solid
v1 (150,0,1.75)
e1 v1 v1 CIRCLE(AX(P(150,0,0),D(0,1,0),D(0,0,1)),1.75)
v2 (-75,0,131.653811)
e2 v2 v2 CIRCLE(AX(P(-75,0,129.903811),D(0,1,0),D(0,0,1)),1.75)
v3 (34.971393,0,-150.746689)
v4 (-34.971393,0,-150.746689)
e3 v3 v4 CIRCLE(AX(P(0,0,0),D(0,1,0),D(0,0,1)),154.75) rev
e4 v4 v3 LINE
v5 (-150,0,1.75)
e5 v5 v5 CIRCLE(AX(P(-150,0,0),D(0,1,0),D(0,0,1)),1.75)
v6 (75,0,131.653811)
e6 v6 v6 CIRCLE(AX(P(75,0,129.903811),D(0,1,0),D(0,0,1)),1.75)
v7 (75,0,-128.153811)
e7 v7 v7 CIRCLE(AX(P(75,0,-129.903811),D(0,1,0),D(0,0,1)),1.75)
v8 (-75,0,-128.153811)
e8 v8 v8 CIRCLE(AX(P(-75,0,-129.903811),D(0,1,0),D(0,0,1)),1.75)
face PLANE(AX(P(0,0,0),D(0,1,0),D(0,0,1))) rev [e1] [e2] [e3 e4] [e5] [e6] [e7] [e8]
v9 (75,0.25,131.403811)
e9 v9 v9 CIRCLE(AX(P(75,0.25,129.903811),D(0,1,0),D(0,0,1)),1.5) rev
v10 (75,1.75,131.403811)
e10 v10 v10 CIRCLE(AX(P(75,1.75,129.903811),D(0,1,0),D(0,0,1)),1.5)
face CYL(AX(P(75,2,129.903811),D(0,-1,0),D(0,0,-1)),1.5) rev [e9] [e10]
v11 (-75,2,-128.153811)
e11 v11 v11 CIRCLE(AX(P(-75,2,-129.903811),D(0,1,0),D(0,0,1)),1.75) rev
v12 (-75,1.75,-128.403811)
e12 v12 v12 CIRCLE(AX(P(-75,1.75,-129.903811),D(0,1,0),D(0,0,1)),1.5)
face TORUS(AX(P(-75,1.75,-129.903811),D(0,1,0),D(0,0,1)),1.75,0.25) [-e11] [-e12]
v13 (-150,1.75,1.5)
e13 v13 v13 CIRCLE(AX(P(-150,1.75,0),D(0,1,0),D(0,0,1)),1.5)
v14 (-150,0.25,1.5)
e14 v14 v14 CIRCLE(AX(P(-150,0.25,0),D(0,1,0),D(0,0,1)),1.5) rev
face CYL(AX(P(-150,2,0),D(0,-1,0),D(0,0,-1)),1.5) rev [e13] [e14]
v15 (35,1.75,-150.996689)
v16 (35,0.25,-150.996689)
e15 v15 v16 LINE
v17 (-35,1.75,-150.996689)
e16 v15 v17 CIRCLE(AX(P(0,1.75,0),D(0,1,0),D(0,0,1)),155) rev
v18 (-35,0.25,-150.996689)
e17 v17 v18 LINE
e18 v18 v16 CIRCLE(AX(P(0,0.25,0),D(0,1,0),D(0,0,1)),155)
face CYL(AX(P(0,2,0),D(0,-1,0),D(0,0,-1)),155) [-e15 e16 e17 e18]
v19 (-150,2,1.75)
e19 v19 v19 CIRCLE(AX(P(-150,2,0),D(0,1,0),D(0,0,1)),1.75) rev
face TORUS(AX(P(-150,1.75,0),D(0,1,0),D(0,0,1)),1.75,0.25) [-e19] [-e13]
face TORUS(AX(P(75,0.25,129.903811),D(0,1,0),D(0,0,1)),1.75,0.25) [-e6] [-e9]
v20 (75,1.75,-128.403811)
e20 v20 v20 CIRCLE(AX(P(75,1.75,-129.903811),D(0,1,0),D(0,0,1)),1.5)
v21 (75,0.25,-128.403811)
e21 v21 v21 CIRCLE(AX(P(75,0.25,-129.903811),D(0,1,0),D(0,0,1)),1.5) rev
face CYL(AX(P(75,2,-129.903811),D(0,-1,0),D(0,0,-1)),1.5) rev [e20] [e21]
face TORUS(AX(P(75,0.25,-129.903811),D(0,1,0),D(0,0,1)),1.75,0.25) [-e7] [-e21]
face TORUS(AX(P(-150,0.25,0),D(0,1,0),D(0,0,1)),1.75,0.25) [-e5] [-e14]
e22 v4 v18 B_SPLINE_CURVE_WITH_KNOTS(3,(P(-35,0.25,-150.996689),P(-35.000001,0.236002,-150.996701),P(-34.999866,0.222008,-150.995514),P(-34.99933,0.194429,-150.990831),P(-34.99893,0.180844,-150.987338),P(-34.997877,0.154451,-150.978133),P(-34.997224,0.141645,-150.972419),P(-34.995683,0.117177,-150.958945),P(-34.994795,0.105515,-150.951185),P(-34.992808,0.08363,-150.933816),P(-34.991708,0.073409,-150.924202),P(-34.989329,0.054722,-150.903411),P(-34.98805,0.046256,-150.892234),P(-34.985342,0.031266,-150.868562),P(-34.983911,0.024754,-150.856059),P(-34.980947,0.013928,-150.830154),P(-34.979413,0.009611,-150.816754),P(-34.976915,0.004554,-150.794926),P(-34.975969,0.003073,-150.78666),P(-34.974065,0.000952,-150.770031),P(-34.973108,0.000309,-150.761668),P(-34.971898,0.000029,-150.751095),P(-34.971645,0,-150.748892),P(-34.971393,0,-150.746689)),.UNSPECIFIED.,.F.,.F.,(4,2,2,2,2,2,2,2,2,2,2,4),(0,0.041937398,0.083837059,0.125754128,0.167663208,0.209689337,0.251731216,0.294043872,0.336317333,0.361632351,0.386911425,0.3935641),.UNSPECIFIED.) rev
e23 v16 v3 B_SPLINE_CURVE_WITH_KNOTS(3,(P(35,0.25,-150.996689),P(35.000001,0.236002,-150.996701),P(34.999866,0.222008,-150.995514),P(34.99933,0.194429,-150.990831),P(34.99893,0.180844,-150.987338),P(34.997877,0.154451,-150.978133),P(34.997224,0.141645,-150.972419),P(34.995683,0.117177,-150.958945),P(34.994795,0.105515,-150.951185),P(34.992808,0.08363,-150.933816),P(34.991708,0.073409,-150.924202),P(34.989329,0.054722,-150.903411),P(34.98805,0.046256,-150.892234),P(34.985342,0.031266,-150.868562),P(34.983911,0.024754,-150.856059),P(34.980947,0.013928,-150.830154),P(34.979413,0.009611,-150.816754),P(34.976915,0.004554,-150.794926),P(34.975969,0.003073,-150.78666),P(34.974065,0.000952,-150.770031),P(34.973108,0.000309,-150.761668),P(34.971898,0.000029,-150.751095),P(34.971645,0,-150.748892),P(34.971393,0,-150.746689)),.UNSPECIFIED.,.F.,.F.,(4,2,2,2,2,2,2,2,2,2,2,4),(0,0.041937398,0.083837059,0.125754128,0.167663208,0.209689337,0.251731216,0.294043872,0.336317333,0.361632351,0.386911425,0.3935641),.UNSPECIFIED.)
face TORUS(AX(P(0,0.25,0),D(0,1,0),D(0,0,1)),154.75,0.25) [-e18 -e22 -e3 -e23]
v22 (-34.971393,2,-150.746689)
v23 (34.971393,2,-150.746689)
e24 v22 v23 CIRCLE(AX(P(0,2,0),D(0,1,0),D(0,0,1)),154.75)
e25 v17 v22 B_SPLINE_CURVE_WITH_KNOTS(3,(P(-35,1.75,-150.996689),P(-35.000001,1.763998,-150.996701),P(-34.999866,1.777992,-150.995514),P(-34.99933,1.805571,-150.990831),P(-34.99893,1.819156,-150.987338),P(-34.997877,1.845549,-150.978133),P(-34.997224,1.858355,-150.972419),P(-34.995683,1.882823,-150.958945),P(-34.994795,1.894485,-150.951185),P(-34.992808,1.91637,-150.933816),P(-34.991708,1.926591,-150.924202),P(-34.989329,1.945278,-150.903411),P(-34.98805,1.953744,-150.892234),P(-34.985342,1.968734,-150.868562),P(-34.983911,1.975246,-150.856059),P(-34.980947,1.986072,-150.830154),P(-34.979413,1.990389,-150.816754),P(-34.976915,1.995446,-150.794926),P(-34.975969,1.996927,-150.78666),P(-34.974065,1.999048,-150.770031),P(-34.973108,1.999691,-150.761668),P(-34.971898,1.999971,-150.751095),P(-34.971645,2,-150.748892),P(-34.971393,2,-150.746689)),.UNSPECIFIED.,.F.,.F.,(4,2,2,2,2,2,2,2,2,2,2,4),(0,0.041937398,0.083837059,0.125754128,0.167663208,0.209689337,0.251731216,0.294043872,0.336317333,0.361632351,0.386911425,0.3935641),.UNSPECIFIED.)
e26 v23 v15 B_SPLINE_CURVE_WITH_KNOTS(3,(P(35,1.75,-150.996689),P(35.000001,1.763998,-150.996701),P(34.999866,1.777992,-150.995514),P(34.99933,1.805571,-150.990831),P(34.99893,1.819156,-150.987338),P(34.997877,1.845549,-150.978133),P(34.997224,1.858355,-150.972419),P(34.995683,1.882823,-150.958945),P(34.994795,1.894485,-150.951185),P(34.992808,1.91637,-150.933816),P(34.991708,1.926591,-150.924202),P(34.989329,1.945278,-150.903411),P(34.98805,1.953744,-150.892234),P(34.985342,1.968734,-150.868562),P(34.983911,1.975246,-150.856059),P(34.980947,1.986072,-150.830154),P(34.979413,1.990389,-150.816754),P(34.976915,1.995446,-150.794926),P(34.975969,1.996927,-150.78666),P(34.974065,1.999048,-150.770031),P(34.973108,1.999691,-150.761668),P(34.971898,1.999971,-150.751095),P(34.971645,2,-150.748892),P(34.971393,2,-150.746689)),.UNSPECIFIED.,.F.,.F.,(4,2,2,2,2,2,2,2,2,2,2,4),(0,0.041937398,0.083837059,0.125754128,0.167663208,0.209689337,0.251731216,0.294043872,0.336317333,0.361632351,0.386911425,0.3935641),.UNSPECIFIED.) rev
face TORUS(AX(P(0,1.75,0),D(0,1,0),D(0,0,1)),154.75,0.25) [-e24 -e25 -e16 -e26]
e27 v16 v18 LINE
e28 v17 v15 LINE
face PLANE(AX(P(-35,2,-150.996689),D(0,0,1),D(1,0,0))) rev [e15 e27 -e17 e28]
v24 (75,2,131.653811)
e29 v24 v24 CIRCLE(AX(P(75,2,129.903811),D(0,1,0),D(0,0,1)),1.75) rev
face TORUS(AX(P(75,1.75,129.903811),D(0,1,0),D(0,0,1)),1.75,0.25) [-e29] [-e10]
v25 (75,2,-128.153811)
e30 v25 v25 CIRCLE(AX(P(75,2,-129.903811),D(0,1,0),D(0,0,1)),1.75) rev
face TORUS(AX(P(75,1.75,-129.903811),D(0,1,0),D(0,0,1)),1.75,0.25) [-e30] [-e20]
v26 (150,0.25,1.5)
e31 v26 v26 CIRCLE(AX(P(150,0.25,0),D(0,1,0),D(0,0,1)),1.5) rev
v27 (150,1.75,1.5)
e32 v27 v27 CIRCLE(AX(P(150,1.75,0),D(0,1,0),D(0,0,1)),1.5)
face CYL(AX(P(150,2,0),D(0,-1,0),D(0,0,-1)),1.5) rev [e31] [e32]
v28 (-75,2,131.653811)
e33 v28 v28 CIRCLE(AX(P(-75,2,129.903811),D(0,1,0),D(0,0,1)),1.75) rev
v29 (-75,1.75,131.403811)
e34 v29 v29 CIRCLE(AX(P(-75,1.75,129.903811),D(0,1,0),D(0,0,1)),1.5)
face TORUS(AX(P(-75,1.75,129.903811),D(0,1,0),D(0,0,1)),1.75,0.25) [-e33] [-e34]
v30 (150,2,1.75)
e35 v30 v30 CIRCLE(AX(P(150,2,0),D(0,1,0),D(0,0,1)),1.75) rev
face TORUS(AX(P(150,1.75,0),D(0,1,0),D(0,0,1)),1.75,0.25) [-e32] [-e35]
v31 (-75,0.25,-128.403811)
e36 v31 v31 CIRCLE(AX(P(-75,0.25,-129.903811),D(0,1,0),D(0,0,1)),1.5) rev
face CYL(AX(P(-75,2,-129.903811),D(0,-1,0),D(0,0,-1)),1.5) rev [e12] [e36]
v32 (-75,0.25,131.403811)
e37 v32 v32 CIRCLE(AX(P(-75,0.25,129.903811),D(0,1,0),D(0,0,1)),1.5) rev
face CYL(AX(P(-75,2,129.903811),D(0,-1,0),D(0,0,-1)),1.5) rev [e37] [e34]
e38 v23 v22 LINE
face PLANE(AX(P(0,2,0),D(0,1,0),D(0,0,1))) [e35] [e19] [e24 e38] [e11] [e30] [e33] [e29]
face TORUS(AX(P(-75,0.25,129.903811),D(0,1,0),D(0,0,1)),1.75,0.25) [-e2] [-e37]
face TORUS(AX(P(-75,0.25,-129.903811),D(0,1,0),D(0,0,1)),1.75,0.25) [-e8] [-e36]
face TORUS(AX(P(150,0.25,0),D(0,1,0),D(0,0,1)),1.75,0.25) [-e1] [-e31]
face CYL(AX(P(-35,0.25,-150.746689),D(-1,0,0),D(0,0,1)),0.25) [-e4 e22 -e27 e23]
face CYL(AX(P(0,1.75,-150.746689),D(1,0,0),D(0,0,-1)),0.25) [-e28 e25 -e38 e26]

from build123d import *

# Parameters (mm, degrees)
BOSS_EXTRUDE1_OUTLINE_R = 1.5
BOSS_EXTRUDE1_DEPTH     = 2
FILLET1_R               = 0.25


# Read off the part's stored shape, not the designer's step: Boss-Extrude1
with BuildPart() as part:
    # Boss-Extrude1 outline → Boss-Extrude1 (new body)
    with BuildSketch(Plane(origin=(0, 0, 0), x_dir=(1, 0, 0), z_dir=(0, 1, 0))):
        with BuildLine():
            ThreePointArc((-35, 150.996688705), (0, -155), (35, 150.996688705))
            Line((35, 150.996688705), (-35, 150.996688705))
        make_face()
        with Locations((-75, -129.903810568)):
            Circle(BOSS_EXTRUDE1_OUTLINE_R, mode=Mode.SUBTRACT)
        with Locations((75, -129.903810568)):
            Circle(BOSS_EXTRUDE1_OUTLINE_R, mode=Mode.SUBTRACT)
        with Locations((-150, 0)):
            Circle(BOSS_EXTRUDE1_OUTLINE_R, mode=Mode.SUBTRACT)
        with Locations((-75, 129.903810568)):
            Circle(BOSS_EXTRUDE1_OUTLINE_R, mode=Mode.SUBTRACT)
        with Locations((150, 0)):
            Circle(BOSS_EXTRUDE1_OUTLINE_R, mode=Mode.SUBTRACT)
        with Locations((75, 129.903810568)):
            Circle(BOSS_EXTRUDE1_OUTLINE_R, mode=Mode.SUBTRACT)
    extrude(amount=BOSS_EXTRUDE1_DEPTH)

    # Fillet1
    fillet1_edges = [part.edges().sort_by_distance(p)[0] for p in [
        (148.5, 0, 0),
        (148.5, 2, 0),
        (73.5, 0, 129.903810568),
        (73.5, 2, 129.903810568),
        (-76.5, 0, 129.903810568),
        (-76.5, 2, 129.903810568),
        (-151.5, 0, 0),
        (-151.5, 2, 0),
        (-76.5, 0, -129.903810568),
        (-76.5, 2, -129.903810568),
        (0, 0, -150.996688705),
        (0, 0, 155),
        (0, 2, 155),
        (0, 2, -150.996688705),
        (73.5, 0, -129.903810568),
        (73.5, 2, -129.903810568),
    ]]
    fillet(fillet1_edges, radius=FILLET1_R)


solid = part.part
